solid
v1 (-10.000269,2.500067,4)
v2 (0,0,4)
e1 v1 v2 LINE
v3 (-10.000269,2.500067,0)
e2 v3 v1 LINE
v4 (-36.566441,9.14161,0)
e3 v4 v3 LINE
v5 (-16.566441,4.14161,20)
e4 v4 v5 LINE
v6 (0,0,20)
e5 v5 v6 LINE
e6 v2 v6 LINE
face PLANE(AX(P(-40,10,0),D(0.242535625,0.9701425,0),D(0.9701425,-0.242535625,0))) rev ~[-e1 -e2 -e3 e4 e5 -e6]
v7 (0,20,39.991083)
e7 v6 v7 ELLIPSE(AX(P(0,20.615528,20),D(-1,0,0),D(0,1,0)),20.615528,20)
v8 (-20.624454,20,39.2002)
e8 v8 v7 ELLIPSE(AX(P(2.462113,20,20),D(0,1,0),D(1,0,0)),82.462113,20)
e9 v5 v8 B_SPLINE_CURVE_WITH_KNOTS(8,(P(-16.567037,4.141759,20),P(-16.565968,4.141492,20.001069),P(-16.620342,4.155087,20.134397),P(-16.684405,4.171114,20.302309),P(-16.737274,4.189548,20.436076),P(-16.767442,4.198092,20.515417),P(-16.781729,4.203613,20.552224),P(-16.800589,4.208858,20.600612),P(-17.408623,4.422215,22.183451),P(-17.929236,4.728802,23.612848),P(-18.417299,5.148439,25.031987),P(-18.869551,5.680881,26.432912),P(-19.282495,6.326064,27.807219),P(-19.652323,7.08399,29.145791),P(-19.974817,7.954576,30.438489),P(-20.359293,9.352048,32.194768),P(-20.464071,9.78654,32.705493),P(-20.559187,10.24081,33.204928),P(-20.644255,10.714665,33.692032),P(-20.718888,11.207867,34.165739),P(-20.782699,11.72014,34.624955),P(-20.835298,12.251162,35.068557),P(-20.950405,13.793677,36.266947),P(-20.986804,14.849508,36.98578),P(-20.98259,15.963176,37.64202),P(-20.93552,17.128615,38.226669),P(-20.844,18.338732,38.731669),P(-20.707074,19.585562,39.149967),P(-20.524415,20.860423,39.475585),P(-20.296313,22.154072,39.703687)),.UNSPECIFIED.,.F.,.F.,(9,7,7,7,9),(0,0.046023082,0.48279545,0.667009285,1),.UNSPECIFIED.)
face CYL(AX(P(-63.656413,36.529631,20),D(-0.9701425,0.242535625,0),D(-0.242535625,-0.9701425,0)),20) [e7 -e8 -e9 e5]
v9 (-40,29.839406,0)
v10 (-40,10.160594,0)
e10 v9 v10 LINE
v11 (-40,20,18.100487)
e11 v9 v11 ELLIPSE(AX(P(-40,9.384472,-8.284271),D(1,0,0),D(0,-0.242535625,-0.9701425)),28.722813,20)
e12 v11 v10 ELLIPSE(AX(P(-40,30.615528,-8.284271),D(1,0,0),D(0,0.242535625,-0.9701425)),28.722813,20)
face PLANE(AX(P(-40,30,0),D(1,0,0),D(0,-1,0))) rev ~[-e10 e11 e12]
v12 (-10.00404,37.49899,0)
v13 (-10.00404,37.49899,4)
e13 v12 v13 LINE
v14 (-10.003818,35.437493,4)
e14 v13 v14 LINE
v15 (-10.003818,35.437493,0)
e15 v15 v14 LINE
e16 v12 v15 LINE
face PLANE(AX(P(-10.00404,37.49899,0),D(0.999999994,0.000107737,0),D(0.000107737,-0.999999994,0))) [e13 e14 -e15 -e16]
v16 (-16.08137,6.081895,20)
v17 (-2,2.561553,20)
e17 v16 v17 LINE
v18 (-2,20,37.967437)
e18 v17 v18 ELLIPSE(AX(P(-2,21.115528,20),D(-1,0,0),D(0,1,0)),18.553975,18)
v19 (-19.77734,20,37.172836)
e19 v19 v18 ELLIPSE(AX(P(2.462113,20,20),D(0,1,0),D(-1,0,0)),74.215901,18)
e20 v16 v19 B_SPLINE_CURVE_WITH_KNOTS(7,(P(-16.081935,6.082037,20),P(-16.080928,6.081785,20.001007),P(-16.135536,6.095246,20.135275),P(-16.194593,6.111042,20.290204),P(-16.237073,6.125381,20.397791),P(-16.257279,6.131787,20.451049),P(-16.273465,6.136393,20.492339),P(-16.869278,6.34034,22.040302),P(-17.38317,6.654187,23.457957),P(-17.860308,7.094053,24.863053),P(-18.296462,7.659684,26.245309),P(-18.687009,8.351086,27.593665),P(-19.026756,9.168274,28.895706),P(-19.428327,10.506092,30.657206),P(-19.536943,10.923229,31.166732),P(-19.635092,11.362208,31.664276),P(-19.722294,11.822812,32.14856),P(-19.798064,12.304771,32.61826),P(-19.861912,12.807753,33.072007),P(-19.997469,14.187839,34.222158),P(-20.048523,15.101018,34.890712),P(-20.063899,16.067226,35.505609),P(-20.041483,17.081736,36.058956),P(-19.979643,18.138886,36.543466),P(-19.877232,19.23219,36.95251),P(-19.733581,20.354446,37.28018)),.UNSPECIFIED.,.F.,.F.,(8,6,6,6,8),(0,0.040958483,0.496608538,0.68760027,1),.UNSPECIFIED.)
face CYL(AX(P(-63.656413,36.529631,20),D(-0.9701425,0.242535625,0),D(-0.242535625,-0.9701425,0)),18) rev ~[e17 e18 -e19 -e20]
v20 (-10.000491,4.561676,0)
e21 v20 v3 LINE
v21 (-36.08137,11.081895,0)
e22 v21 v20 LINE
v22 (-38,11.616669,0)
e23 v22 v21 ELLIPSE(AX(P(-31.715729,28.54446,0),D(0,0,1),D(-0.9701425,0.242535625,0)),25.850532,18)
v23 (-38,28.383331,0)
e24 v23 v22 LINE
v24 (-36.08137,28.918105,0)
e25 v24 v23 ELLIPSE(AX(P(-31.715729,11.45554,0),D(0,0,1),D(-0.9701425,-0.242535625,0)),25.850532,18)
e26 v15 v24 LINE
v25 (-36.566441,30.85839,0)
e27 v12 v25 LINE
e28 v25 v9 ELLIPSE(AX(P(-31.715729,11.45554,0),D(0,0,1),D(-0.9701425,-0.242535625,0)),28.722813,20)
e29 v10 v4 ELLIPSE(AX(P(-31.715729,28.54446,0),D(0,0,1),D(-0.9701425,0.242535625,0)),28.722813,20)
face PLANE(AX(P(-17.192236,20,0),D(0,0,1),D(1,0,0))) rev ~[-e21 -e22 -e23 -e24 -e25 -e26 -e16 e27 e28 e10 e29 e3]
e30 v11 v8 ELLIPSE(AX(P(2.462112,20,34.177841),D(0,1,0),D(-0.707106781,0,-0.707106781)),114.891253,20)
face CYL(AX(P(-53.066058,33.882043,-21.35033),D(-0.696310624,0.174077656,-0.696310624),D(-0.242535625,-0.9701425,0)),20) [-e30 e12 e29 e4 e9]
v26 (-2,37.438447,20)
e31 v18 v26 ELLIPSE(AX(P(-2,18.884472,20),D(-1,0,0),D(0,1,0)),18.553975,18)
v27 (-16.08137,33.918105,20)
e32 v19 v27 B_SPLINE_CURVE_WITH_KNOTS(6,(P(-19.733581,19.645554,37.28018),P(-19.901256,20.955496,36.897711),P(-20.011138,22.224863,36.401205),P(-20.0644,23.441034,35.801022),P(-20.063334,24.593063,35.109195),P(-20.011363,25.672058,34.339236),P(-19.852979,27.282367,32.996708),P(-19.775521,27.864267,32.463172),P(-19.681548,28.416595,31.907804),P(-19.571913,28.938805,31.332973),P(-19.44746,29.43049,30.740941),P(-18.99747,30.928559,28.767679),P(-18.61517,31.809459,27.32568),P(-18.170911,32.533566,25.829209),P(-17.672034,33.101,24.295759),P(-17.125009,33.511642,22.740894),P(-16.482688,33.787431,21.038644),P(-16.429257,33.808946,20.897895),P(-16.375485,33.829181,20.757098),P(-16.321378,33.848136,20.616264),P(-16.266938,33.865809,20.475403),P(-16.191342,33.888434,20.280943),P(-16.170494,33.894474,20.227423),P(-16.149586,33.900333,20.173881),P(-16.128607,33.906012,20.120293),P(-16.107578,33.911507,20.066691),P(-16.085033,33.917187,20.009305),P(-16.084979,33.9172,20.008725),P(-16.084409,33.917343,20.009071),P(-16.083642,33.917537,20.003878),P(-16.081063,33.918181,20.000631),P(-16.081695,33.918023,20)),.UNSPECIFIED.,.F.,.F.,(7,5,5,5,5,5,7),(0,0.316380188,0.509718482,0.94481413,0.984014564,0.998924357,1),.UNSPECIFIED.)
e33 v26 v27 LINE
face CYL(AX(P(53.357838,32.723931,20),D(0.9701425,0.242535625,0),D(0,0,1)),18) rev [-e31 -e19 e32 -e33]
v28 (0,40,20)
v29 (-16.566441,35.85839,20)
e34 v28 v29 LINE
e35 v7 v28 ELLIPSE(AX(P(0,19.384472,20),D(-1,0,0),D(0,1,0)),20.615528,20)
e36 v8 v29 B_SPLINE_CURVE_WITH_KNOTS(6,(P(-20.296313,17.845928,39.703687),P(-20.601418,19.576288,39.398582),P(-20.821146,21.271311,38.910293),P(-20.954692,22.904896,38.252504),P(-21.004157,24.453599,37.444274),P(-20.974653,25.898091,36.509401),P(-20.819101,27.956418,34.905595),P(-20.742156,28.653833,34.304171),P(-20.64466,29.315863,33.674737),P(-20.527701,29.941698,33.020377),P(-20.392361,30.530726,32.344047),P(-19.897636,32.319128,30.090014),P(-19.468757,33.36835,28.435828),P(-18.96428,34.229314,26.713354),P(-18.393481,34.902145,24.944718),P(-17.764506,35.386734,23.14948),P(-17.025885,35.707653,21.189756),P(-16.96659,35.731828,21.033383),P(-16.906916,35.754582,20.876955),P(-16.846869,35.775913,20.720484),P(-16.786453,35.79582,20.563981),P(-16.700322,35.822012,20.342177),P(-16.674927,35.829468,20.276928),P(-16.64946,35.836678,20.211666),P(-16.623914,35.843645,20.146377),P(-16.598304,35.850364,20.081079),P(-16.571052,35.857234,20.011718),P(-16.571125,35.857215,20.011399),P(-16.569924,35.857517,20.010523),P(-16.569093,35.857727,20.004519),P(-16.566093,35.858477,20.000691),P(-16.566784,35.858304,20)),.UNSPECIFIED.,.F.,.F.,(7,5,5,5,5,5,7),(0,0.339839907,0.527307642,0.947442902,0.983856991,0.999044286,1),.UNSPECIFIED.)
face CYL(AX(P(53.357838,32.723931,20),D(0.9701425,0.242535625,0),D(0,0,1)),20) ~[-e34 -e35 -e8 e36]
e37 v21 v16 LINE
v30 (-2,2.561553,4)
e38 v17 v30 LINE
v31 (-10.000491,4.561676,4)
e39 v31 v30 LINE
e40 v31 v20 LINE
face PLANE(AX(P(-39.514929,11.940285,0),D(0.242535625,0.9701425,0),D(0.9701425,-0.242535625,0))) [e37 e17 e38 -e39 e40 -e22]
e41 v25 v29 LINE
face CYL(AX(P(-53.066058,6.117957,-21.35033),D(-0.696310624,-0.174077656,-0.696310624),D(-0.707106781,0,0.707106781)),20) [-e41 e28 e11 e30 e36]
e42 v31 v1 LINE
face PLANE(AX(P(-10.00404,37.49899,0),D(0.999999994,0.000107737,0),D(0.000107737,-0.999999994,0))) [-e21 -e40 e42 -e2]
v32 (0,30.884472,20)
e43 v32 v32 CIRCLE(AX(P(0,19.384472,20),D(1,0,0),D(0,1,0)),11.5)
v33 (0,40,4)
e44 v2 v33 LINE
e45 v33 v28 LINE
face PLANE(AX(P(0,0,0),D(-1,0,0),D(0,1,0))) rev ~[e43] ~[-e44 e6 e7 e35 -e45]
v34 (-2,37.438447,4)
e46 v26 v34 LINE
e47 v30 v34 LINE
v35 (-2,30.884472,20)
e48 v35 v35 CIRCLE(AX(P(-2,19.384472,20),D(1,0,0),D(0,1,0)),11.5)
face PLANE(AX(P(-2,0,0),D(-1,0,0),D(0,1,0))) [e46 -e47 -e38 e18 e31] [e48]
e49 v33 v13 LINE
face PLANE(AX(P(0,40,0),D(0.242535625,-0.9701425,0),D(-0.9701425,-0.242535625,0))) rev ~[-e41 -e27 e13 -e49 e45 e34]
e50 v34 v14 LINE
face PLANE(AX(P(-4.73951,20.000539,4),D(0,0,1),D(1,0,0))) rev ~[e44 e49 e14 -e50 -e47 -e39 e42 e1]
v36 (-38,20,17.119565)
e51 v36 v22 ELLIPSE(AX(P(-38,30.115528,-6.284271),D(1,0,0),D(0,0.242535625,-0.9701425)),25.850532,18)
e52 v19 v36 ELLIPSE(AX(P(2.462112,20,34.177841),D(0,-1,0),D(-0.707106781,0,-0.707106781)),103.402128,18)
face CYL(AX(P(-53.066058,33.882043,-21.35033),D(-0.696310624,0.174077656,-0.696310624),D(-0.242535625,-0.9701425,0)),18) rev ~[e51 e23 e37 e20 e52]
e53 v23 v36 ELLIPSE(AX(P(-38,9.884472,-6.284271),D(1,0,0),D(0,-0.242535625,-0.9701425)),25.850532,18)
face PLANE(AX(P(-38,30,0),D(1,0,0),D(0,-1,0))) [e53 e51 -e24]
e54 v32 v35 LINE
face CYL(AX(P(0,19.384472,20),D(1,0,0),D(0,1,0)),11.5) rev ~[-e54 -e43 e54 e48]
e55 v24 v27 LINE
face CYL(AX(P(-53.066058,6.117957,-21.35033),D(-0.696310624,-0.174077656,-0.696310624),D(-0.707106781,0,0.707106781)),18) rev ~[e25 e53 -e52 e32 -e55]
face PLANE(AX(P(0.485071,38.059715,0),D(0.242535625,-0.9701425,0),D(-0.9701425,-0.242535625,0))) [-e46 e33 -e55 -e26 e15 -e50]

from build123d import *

# Parameters (mm, degrees)
F1_DEPTH    = 40
F2_SIZE     = 20
F3_T1_DEPTH = 120.6155281281
F3_T3_DEPTH = 120.6155281281
F3_T5_DEPTH = 112.8188914216
F3_T7_DEPTH = 112.8188914216
F5_T        = -2
F4_R        = 11.5
F6_DEPTH    = 5
F8_DEPTH    = 4


# Not quite as in the source:
# - a fillet or chamfer that OpenCascade refuses, or shapes differently, is made with other operations: its cross-section is extruded or revolved along the edge and cut away or added


with BuildPart() as f1:
    # F0 (on Top) → F1 (new body)
    with BuildSketch(Plane.XY):
        Polygon((-40, 10), (0, 0), (0, 40), (-40, 30), align=None)
    extrude(amount=F1_DEPTH)

    # F2
    f2_edges = [f1.edges().sort_by_distance(p)[0] for p in [
        (-40, 20, 40),
    ]]
    chamfer(f2_edges, length=F2_SIZE)

    # F3: fillet of radius 20 on 4 edges, made by hand

    # F3_s2 → F3_t1 (cut)
    with BuildSketch(Plane(origin=(57.9188897131, 14.4797224283, 0), x_dir=(0, 0, 1), z_dir=(-0.9701425001, -0.242535625, 0))):
        with BuildLine():
            ThreePointArc((40, 18.8057000058), (34.1421356237, 32.9478356295), (20, 38.8057000058))
            Line((20, 38.8057000058), (40, 38.8057000058))
            Line((40, 38.8057000058), (40, 18.8057000058))
        make_face()
    extrude(amount=F3_T1_DEPTH, mode=Mode.SUBTRACT)

    # F3_s4 → F3_t3 (cut)
    with BuildSketch(Plane(origin=(-68.5071250073, 17.1267812518, 0), x_dir=(0, 0, 1), z_dir=(0.9701425001, -0.242535625, 0))):
        with BuildLine():
            ThreePointArc((20, 0), (34.1421356237, -5.8578643763), (40, -20))
            Line((40, -20), (40, 0))
            Line((40, 0), (20, 0))
        make_face()
    extrude(amount=F3_T3_DEPTH, mode=Mode.SUBTRACT)

    # F3_s6 → F3_t5 (cut)
    with BuildSketch(Plane(origin=(-40.1875872415, 10.0468968104, -40.1875872415), x_dir=(0.242535625, 0.9701425001, 0), z_dir=(0.6963106238, -0.174077656, 0.6963106238))):
        with BuildLine():
            ThreePointArc((0, 26.2452181161), (4.6931480366, 39.1176803115), (16.5700282971, 45.948905439))
            Line((16.5700282971, 45.948905439), (0, 43.0644337539))
            Line((0, 43.0644337539), (0, 26.2452181161))
        make_face()
    extrude(amount=F3_T5_DEPTH, mode=Mode.SUBTRACT)

    # F3_s8 → F3_t7 (cut)
    with BuildSketch(Plane(origin=(-35.339102393, -8.8347755983, -35.339102393), x_dir=(-0.242535625, 0.9701425001, 0), z_dir=(0.6963106238, 0.174077656, 0.6963106238))):
        with BuildLine():
            ThreePointArc((22.2356717087, 39.1937001443), (34.1125519692, 32.3624750168), (38.8057000058, 19.4900128214))
            Line((38.8057000058, 19.4900128214), (38.8057000058, 36.3092284592))
            Line((38.8057000058, 36.3092284592), (22.2356717087, 39.1937001443))
        make_face()
    extrude(amount=F3_T7_DEPTH, mode=Mode.SUBTRACT)

    # F5
    f5_openings = [f1.faces().sort_by_distance(p)[0] for p in [
        (-17.771277, 20, 0),
    ]]
    offset(amount=F5_T, openings=f5_openings)

    # F4 (on face) → F6 (cut)
    with BuildSketch(Plane.YZ):
        with Locations((19.3844718719, 20)):
            Circle(F4_R)
    extrude(amount=-F6_DEPTH, mode=Mode.SUBTRACT)

    # F7 (on face) → F8 (cut)
    with BuildSketch(Plane.XY):
        Polygon((-10.0002693493, 2.5000673373), (0, 0), (0, 40), (-10.0040400222, 37.4989899944), align=None)
    extrude(amount=F8_DEPTH, mode=Mode.SUBTRACT)


solid = f1.part
